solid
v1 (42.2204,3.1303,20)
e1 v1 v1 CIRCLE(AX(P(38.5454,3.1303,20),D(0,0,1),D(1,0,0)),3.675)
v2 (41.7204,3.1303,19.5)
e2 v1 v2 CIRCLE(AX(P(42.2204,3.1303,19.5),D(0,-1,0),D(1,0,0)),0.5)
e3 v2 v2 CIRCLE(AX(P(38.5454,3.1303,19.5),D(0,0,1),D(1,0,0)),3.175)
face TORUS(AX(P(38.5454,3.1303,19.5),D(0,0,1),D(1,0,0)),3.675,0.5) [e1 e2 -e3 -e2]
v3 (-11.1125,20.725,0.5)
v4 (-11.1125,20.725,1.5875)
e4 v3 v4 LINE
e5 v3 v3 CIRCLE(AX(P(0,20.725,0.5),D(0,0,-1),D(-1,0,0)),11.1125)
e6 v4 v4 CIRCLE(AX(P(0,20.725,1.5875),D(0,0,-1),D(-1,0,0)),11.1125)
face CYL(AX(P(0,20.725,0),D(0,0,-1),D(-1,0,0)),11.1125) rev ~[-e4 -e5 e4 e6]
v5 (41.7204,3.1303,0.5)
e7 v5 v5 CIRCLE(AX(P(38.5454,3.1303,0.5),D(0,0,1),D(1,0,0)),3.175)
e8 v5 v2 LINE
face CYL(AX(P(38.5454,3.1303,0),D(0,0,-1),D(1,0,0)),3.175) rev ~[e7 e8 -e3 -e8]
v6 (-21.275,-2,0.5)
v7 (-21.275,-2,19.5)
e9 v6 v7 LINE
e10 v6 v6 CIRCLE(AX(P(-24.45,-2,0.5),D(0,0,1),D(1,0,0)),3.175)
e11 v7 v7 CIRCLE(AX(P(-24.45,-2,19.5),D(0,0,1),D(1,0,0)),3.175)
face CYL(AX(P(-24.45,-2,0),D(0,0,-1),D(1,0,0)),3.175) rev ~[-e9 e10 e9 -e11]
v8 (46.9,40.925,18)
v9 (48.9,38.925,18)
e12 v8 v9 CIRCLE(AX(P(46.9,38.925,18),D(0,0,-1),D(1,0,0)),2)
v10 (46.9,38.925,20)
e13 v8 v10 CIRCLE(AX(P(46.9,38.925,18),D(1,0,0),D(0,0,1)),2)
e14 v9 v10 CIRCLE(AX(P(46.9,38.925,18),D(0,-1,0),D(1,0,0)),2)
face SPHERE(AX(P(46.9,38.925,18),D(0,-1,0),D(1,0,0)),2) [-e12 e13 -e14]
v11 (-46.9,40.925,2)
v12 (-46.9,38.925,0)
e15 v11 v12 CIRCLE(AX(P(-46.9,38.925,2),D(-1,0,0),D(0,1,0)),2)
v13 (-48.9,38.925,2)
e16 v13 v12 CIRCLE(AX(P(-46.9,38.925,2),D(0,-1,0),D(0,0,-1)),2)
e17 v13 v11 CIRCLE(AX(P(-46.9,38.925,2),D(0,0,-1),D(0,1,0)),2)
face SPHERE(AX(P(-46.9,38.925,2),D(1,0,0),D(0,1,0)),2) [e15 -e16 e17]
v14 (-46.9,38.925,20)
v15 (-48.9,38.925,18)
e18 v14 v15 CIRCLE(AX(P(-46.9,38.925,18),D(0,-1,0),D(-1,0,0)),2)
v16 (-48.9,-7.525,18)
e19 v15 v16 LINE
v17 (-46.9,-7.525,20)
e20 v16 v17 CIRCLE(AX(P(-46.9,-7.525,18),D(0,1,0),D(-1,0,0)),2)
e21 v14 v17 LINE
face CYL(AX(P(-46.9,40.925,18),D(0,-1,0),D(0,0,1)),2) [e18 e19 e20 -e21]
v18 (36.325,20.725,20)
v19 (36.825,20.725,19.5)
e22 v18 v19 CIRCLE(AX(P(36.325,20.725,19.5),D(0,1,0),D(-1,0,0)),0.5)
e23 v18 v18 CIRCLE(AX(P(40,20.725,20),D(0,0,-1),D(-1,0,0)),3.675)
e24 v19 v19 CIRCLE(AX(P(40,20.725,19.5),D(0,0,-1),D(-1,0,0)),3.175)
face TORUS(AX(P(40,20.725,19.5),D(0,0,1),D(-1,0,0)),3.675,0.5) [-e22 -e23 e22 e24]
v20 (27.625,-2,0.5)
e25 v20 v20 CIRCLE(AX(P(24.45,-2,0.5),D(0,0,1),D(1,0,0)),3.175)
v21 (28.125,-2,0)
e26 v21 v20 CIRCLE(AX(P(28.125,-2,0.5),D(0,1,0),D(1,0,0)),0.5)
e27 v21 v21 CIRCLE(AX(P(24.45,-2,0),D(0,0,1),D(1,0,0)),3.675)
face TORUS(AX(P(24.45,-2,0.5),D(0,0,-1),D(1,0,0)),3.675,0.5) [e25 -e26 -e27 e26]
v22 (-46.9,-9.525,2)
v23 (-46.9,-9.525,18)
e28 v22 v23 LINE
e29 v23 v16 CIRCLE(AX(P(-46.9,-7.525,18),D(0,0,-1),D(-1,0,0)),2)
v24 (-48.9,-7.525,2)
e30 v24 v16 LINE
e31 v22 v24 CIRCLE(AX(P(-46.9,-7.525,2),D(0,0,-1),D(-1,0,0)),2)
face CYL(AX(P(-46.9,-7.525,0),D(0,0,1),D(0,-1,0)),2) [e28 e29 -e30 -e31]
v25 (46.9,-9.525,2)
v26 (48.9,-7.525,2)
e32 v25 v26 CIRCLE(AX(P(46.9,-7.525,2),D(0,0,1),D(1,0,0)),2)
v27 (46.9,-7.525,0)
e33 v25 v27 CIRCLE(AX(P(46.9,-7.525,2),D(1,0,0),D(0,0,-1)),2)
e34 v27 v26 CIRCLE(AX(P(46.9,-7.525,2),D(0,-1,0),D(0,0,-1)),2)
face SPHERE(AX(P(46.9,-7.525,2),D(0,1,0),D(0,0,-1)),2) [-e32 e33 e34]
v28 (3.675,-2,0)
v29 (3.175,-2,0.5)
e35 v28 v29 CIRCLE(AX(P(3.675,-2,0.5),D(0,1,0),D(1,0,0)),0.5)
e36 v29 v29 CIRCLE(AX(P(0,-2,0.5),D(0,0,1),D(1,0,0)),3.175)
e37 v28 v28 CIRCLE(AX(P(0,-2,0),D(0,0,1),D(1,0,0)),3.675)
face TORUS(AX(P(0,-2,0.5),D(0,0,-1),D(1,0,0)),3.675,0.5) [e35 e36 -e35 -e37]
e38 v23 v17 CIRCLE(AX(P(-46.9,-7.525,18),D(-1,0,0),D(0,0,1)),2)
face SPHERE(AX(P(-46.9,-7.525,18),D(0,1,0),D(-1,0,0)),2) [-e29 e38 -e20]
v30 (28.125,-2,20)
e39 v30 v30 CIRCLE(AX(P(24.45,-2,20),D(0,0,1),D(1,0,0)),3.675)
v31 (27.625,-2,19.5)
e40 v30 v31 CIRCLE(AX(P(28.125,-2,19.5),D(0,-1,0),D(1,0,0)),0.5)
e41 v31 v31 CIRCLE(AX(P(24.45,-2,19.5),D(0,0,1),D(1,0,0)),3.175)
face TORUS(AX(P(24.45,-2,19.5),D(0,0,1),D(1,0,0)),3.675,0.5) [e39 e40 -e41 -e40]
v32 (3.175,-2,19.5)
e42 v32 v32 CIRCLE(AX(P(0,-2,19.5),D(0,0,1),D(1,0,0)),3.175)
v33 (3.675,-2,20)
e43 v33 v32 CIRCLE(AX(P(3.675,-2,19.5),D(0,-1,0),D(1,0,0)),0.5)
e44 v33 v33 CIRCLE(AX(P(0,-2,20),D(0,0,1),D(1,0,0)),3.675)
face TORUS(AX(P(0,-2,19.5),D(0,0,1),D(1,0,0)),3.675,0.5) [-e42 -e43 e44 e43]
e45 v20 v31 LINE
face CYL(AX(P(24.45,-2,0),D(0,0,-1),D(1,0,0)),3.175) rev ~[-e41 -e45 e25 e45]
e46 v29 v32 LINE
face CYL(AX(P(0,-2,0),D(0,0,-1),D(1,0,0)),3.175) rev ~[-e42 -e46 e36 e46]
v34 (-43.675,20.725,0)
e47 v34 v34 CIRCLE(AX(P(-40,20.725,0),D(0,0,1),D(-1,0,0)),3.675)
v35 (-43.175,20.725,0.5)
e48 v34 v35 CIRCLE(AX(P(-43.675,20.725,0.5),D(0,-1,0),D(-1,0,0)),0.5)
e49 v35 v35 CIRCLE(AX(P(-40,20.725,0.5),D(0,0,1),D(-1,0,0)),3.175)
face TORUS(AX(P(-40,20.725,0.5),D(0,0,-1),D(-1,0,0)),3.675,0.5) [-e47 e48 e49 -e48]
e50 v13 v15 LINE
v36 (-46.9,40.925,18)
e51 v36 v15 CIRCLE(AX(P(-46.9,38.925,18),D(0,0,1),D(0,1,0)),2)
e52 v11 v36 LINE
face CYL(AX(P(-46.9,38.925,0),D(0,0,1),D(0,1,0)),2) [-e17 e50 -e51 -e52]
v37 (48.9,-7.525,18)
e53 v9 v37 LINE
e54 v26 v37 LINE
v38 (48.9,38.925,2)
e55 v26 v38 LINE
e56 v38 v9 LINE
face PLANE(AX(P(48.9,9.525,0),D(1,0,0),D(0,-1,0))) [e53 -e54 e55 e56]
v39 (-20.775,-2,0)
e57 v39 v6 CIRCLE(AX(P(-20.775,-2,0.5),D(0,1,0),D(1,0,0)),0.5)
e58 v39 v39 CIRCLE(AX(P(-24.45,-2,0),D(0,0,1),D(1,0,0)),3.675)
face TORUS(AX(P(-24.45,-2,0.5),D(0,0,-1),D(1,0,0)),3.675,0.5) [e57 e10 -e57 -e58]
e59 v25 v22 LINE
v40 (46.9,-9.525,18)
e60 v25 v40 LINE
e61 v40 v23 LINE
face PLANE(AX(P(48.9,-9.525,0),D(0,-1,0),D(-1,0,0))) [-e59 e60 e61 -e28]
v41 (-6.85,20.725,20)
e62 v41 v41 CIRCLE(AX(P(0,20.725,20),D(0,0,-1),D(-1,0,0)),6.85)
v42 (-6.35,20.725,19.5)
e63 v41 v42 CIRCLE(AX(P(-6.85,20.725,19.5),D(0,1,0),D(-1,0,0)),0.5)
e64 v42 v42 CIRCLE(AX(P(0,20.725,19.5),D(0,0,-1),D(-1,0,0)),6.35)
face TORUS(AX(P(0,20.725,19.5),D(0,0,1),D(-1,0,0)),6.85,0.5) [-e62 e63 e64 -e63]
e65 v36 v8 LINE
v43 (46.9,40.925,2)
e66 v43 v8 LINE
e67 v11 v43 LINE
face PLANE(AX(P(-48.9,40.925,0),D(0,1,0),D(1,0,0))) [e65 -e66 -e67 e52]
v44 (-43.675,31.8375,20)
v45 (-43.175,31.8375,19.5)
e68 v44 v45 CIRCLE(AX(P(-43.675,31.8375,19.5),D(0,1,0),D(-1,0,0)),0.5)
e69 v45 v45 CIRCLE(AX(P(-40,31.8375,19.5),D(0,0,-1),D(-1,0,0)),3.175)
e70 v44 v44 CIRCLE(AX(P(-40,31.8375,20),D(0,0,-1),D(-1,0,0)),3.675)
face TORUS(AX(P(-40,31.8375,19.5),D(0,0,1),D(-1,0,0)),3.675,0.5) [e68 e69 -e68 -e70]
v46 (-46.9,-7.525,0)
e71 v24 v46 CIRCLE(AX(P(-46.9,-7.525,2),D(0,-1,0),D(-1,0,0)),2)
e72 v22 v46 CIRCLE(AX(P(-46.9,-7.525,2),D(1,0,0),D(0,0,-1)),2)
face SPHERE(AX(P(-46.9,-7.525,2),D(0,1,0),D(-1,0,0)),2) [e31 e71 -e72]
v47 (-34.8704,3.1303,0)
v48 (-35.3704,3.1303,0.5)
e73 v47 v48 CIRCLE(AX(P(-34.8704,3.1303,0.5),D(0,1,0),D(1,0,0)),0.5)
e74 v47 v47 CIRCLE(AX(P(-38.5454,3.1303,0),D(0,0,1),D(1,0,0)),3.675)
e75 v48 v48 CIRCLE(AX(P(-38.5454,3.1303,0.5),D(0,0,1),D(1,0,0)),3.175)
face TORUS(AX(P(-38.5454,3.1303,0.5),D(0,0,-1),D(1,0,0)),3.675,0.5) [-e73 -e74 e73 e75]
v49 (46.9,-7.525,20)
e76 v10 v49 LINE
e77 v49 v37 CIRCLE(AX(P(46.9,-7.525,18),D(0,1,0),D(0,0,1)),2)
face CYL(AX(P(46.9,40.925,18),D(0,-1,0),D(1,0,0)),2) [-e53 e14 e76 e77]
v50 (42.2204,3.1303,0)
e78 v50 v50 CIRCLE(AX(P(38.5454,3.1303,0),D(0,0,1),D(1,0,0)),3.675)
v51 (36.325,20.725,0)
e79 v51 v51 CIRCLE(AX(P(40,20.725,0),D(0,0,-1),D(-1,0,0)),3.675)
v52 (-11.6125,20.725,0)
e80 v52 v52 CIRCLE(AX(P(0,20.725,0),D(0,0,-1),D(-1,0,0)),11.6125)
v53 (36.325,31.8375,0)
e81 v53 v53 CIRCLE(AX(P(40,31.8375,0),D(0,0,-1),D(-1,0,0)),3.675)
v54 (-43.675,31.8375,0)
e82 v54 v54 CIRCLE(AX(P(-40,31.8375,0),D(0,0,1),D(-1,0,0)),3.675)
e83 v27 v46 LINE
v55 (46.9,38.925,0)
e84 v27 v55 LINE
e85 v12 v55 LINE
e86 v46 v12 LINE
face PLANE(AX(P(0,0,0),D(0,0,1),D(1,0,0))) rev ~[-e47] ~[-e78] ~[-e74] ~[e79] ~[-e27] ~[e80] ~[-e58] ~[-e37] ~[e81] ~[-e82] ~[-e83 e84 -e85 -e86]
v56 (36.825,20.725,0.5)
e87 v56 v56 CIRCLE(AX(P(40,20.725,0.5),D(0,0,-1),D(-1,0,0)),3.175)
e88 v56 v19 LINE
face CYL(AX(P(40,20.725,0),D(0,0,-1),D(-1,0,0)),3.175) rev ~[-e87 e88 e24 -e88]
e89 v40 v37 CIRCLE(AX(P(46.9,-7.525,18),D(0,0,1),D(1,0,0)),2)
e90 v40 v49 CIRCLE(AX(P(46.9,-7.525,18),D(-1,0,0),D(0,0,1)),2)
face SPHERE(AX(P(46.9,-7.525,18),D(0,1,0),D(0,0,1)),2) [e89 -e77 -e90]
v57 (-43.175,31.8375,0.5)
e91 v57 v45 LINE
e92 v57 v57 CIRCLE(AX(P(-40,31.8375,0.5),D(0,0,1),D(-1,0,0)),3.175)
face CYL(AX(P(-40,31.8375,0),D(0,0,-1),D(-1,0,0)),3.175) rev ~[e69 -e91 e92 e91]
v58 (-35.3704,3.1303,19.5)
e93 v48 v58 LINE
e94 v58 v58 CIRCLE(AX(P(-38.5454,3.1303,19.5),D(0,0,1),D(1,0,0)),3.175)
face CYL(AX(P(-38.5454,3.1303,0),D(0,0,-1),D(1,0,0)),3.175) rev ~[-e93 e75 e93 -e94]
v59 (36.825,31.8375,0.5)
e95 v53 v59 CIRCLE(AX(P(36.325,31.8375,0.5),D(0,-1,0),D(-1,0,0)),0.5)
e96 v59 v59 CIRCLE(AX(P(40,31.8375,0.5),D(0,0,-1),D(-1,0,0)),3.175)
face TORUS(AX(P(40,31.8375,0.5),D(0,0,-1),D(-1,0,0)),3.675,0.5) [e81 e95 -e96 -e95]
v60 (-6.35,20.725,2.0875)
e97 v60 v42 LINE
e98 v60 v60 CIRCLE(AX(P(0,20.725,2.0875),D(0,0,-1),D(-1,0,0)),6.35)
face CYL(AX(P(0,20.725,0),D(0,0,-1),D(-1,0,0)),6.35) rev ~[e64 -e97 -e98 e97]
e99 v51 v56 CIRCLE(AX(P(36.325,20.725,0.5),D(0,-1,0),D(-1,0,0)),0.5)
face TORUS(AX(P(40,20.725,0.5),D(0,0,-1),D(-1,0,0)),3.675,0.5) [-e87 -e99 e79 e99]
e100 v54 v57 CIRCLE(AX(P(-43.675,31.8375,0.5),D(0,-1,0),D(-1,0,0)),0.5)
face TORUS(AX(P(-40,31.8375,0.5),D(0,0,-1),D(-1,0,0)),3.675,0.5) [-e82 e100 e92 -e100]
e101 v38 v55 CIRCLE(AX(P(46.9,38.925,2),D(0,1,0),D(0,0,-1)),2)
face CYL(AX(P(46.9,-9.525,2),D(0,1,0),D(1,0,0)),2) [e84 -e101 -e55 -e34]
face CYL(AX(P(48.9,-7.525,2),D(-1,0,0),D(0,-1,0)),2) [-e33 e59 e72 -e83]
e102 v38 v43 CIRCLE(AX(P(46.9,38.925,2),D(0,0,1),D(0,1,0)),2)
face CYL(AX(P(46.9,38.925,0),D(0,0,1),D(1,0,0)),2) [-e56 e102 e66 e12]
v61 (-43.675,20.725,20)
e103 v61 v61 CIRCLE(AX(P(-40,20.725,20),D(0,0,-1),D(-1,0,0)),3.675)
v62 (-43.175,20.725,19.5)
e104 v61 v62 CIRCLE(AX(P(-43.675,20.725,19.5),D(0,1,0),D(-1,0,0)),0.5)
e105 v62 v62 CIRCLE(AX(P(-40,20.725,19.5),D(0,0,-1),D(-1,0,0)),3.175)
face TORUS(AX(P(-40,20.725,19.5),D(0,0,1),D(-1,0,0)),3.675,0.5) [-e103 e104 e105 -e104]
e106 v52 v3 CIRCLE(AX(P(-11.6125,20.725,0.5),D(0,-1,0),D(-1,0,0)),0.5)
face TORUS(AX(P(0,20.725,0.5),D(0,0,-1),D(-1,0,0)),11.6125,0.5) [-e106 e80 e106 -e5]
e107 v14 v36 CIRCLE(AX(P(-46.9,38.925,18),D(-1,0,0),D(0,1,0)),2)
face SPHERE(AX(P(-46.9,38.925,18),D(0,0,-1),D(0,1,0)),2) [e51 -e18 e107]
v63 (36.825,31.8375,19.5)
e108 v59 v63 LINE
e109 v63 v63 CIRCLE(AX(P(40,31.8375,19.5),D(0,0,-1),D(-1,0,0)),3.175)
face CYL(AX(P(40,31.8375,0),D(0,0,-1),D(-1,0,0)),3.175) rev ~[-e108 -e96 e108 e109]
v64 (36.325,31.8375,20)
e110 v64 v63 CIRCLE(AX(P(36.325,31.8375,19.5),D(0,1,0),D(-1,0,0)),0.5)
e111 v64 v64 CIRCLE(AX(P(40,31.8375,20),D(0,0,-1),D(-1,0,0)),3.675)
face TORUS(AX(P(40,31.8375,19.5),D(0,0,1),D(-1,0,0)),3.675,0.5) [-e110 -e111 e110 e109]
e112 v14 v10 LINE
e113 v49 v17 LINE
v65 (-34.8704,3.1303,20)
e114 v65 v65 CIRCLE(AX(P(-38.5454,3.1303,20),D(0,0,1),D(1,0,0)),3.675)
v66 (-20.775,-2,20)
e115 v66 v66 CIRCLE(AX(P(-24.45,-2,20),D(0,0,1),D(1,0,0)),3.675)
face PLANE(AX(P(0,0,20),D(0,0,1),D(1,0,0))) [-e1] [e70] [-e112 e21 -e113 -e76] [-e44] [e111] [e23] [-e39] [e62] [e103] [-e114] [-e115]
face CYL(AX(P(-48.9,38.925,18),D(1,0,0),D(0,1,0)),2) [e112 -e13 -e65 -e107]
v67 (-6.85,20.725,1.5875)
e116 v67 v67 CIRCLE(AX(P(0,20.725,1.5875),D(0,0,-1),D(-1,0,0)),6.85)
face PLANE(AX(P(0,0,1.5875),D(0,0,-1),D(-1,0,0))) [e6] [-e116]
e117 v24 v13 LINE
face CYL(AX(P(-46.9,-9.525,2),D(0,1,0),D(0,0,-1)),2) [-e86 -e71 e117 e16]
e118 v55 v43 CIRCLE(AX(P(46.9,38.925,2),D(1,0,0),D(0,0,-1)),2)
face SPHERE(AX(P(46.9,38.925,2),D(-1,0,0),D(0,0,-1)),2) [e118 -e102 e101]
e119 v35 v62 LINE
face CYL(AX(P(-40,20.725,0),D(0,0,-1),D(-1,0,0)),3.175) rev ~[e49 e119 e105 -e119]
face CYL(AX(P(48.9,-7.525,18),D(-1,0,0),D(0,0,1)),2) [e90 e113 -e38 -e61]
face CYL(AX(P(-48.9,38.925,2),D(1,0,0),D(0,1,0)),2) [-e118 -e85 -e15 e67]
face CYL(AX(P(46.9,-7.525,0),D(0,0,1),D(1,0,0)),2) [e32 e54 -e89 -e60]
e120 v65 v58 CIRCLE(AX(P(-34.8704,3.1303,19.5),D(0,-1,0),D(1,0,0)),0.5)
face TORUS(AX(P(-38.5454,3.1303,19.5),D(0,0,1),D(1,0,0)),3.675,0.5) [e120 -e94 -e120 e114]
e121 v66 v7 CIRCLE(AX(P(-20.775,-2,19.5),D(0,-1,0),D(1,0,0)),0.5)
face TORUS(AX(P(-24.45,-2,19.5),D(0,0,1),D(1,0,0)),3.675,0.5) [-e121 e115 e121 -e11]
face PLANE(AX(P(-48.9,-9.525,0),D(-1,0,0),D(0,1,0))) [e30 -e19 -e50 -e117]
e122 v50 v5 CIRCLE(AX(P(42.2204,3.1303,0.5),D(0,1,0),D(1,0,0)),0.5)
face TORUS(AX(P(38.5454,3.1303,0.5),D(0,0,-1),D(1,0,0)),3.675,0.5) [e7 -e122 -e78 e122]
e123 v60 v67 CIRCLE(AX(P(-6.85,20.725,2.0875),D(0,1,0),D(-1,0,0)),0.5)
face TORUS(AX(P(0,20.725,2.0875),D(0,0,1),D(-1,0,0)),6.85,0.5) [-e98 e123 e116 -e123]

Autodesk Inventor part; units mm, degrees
sketch "Sketch1" plane through (0, 0, 0) normal (0, 0, 1) x (1, 0, 0)
  line L0 (-48.9, 9.525) -> (48.9, 9.525)
  line L1 (48.9, 9.525) -> (48.9, -9.525)
  line L2 (48.9, -9.525) -> (-48.9, -9.525)
  line L3 (-48.9, -9.525) -> (-48.9, 9.525)
  line L4 (-48.9, 9.525) -> (48.9, -9.525) construction
  line L5 (48.9, 9.525) -> (-48.9, -9.525) construction
  line L6 (48.9, 9.525) -> (48.9, 5.525)
  circle A0 centre (-24.45, -2) radius 3.175
  circle A1 centre (0, -2) radius 3.175
  circle A2 centre (24.45, -2) radius 3.175
  line L7 (24.45, -2) -> (39.45, -2) construction
  circle A3 centre (38.5454, 3.1303) radius 3.175
  line L8 (-24.45, -2) -> (-9.45, -2) construction
  circle A4 centre (-38.5454, 3.1303) radius 3.175
  point P0 (0, 0)
  dimension "d0" = 97.8
  dimension "d1" = 19.05
  dimension "d3" = 4
  dimension "d7" = 6.35
  dimension "d8" = 6.35
  dimension "d9" = 6.35
  dimension "d25" = 6.35
  dimension "d28" = 6.35
ref_plane "Work Plane2" through (0, 0, 0) normal (0, 0, -1) x (-1, 0, 0)
sketch "Sketch2" plane through (0, 0, 0) normal (0, 0, -1) x (-1, 0, 0)
  line L0 (-48.9, 9.525) -> (48.9, 9.525) projected
  line L1 (-48.9, 9.525) -> (48.9, 9.525)
  line L2 (48.9, 9.525) -> (48.9, 30.925)
  line L3 (48.9, 30.925) -> (-48.9, 30.925)
  line L4 (-48.9, 30.925) -> (-48.9, 9.525)
  circle A0 centre (0, -2) radius 2.5 projected
  line L5 (0, -2) -> (0, 9.525)
  line L6 (0, 9.525) -> (0, 20.725)
  circle A1 centre (0, 20.725) radius 6.35
  point P0 (0, 0)
  dimension "d12" = 21.4
  dimension "d13" = 11.2
  dimension "d14" = 12.7
extrude "Extrusion2" add sketch "Sketch2" against normal blind 20 contours L4 L3 L2 L0
ref_plane "Work Plane1" through (0, 0, 0) normal (0, 0, -1) x (-1, 0, 0)
sketch "Sketch3" plane through (0, 0, 0) normal (0, 0, -1) x (-1, 0, 0)
  line L0 (-48.9, -9.525) -> (-48.9, 30.925) projected
  line L1 (-48.9, 30.925) -> (48.9, 30.925)
  line L2 (48.9, 30.925) -> (48.9, 40.925)
  line L3 (48.9, 40.925) -> (-48.9, 40.925)
  line L4 (-48.9, 40.925) -> (-48.9, 30.925)
  point P0 (0, 0)
  dimension "d17" = 10
extrude "Extrusion3" add sketch "Sketch3" against normal blind 20
ref_plane "Work Plane3" through (0, 0, 0) normal (0, 0, -1) x (-1, 0, 0)
sketch "Sketch4" plane through (0, 0, 0) normal (0, 0, -1) x (-1, 0, 0)
  circle A0 centre (0, 20.725) radius 6.35 projected
  circle A1 centre (0, 20.725) radius 11.1125
  point P0 (0, 0)
  dimension "d20" = 22.225
extrude "Extrusion4" cut sketch "Sketch4" against normal blind 1.5875
sketch "Sketch5" plane through (0, 0, 0) normal (0, 0, -1) x (-1, 0, 0)
  point P0 (0, 0)
extrude "Extrusion5" add sketch "Sketch1" along normal blind 20
sketch "Sketch6" plane through (0, 0, 0) normal (0, 0, -1) x (-1, 0, 0)
  circle A0 centre (0, 20.725) radius 11.1125 projected
  line L0 (0, 20.725) -> (-40, 20.725)
  circle A1 centre (0, 20.725) radius 6.35 projected
  line L1 (0, 20.725) -> (40, 20.725)
  line L2 (0, 31.8375) -> (-40, 31.8375)
  line L3 (0, 31.8375) -> (40, 31.8375)
  circle A2 centre (-40, 31.8375) radius 3.175
  circle A3 centre (-40, 20.725) radius 3.175
  circle A4 centre (40, 31.8375) radius 3.175
  circle A5 centre (40, 20.725) radius 3.175
  point P0 (0, 0)
  dimension "d31" = 40
  dimension "d32" = 40
  dimension "d33" = 40
  dimension "d34" = 6.35
  dimension "d35" = 6.35
  dimension "d36" = 6.35
  dimension "d37" = 6.35
extrude "Extrusion6" cut sketch "Sketch6" against normal blind 20 contours A2 | A3 | A4 | A5
fillet "Fillet1" radius 2 12 edges at (0, 40.925, 0) (48.9, 15.7, 0) (48.9, 15.7, 20) (48.9, 40.925, 10) (-48.9, 40.925, 10) (0, 40.925, 20) (-48.9, 15.7, 20) (-48.9, 15.7, 0) (-48.9, -9.525, 10) (0, -9.525, 20) (0, -9.525, 0) (48.9, -9.525, 10)
fillet "Fillet2" radius 0.5 21 edges at (6.35, 20.725, 20) (-27.625, -2, 20) (-41.7204, 3.1303, 20) (-3.175, -2, 20) (21.275, -2, 20) (35.3704, 3.1303, 20) (43.175, 20.725, 20) (43.175, 31.8375, 20) (-36.825, 20.725, 20) (-36.825, 31.8375, 20) (43.175, 31.8375, 0) (43.175, 20.725, 0) (35.3704, 3.1303, 0) (21.275, -2, 0) (-3.175, -2, 0) (-27.625, -2, 0) (-41.7204, 3.1303, 0) (-36.825, 20.725, 0) (-36.825, 31.8375, 0) (11.1125, 20.725, 0) (6.35, 20.725, 1.5875)
properties part number "5213_Bias_TxRx_Relative_Adapter_MPSv2_v1" material "Aluminum 6061"
